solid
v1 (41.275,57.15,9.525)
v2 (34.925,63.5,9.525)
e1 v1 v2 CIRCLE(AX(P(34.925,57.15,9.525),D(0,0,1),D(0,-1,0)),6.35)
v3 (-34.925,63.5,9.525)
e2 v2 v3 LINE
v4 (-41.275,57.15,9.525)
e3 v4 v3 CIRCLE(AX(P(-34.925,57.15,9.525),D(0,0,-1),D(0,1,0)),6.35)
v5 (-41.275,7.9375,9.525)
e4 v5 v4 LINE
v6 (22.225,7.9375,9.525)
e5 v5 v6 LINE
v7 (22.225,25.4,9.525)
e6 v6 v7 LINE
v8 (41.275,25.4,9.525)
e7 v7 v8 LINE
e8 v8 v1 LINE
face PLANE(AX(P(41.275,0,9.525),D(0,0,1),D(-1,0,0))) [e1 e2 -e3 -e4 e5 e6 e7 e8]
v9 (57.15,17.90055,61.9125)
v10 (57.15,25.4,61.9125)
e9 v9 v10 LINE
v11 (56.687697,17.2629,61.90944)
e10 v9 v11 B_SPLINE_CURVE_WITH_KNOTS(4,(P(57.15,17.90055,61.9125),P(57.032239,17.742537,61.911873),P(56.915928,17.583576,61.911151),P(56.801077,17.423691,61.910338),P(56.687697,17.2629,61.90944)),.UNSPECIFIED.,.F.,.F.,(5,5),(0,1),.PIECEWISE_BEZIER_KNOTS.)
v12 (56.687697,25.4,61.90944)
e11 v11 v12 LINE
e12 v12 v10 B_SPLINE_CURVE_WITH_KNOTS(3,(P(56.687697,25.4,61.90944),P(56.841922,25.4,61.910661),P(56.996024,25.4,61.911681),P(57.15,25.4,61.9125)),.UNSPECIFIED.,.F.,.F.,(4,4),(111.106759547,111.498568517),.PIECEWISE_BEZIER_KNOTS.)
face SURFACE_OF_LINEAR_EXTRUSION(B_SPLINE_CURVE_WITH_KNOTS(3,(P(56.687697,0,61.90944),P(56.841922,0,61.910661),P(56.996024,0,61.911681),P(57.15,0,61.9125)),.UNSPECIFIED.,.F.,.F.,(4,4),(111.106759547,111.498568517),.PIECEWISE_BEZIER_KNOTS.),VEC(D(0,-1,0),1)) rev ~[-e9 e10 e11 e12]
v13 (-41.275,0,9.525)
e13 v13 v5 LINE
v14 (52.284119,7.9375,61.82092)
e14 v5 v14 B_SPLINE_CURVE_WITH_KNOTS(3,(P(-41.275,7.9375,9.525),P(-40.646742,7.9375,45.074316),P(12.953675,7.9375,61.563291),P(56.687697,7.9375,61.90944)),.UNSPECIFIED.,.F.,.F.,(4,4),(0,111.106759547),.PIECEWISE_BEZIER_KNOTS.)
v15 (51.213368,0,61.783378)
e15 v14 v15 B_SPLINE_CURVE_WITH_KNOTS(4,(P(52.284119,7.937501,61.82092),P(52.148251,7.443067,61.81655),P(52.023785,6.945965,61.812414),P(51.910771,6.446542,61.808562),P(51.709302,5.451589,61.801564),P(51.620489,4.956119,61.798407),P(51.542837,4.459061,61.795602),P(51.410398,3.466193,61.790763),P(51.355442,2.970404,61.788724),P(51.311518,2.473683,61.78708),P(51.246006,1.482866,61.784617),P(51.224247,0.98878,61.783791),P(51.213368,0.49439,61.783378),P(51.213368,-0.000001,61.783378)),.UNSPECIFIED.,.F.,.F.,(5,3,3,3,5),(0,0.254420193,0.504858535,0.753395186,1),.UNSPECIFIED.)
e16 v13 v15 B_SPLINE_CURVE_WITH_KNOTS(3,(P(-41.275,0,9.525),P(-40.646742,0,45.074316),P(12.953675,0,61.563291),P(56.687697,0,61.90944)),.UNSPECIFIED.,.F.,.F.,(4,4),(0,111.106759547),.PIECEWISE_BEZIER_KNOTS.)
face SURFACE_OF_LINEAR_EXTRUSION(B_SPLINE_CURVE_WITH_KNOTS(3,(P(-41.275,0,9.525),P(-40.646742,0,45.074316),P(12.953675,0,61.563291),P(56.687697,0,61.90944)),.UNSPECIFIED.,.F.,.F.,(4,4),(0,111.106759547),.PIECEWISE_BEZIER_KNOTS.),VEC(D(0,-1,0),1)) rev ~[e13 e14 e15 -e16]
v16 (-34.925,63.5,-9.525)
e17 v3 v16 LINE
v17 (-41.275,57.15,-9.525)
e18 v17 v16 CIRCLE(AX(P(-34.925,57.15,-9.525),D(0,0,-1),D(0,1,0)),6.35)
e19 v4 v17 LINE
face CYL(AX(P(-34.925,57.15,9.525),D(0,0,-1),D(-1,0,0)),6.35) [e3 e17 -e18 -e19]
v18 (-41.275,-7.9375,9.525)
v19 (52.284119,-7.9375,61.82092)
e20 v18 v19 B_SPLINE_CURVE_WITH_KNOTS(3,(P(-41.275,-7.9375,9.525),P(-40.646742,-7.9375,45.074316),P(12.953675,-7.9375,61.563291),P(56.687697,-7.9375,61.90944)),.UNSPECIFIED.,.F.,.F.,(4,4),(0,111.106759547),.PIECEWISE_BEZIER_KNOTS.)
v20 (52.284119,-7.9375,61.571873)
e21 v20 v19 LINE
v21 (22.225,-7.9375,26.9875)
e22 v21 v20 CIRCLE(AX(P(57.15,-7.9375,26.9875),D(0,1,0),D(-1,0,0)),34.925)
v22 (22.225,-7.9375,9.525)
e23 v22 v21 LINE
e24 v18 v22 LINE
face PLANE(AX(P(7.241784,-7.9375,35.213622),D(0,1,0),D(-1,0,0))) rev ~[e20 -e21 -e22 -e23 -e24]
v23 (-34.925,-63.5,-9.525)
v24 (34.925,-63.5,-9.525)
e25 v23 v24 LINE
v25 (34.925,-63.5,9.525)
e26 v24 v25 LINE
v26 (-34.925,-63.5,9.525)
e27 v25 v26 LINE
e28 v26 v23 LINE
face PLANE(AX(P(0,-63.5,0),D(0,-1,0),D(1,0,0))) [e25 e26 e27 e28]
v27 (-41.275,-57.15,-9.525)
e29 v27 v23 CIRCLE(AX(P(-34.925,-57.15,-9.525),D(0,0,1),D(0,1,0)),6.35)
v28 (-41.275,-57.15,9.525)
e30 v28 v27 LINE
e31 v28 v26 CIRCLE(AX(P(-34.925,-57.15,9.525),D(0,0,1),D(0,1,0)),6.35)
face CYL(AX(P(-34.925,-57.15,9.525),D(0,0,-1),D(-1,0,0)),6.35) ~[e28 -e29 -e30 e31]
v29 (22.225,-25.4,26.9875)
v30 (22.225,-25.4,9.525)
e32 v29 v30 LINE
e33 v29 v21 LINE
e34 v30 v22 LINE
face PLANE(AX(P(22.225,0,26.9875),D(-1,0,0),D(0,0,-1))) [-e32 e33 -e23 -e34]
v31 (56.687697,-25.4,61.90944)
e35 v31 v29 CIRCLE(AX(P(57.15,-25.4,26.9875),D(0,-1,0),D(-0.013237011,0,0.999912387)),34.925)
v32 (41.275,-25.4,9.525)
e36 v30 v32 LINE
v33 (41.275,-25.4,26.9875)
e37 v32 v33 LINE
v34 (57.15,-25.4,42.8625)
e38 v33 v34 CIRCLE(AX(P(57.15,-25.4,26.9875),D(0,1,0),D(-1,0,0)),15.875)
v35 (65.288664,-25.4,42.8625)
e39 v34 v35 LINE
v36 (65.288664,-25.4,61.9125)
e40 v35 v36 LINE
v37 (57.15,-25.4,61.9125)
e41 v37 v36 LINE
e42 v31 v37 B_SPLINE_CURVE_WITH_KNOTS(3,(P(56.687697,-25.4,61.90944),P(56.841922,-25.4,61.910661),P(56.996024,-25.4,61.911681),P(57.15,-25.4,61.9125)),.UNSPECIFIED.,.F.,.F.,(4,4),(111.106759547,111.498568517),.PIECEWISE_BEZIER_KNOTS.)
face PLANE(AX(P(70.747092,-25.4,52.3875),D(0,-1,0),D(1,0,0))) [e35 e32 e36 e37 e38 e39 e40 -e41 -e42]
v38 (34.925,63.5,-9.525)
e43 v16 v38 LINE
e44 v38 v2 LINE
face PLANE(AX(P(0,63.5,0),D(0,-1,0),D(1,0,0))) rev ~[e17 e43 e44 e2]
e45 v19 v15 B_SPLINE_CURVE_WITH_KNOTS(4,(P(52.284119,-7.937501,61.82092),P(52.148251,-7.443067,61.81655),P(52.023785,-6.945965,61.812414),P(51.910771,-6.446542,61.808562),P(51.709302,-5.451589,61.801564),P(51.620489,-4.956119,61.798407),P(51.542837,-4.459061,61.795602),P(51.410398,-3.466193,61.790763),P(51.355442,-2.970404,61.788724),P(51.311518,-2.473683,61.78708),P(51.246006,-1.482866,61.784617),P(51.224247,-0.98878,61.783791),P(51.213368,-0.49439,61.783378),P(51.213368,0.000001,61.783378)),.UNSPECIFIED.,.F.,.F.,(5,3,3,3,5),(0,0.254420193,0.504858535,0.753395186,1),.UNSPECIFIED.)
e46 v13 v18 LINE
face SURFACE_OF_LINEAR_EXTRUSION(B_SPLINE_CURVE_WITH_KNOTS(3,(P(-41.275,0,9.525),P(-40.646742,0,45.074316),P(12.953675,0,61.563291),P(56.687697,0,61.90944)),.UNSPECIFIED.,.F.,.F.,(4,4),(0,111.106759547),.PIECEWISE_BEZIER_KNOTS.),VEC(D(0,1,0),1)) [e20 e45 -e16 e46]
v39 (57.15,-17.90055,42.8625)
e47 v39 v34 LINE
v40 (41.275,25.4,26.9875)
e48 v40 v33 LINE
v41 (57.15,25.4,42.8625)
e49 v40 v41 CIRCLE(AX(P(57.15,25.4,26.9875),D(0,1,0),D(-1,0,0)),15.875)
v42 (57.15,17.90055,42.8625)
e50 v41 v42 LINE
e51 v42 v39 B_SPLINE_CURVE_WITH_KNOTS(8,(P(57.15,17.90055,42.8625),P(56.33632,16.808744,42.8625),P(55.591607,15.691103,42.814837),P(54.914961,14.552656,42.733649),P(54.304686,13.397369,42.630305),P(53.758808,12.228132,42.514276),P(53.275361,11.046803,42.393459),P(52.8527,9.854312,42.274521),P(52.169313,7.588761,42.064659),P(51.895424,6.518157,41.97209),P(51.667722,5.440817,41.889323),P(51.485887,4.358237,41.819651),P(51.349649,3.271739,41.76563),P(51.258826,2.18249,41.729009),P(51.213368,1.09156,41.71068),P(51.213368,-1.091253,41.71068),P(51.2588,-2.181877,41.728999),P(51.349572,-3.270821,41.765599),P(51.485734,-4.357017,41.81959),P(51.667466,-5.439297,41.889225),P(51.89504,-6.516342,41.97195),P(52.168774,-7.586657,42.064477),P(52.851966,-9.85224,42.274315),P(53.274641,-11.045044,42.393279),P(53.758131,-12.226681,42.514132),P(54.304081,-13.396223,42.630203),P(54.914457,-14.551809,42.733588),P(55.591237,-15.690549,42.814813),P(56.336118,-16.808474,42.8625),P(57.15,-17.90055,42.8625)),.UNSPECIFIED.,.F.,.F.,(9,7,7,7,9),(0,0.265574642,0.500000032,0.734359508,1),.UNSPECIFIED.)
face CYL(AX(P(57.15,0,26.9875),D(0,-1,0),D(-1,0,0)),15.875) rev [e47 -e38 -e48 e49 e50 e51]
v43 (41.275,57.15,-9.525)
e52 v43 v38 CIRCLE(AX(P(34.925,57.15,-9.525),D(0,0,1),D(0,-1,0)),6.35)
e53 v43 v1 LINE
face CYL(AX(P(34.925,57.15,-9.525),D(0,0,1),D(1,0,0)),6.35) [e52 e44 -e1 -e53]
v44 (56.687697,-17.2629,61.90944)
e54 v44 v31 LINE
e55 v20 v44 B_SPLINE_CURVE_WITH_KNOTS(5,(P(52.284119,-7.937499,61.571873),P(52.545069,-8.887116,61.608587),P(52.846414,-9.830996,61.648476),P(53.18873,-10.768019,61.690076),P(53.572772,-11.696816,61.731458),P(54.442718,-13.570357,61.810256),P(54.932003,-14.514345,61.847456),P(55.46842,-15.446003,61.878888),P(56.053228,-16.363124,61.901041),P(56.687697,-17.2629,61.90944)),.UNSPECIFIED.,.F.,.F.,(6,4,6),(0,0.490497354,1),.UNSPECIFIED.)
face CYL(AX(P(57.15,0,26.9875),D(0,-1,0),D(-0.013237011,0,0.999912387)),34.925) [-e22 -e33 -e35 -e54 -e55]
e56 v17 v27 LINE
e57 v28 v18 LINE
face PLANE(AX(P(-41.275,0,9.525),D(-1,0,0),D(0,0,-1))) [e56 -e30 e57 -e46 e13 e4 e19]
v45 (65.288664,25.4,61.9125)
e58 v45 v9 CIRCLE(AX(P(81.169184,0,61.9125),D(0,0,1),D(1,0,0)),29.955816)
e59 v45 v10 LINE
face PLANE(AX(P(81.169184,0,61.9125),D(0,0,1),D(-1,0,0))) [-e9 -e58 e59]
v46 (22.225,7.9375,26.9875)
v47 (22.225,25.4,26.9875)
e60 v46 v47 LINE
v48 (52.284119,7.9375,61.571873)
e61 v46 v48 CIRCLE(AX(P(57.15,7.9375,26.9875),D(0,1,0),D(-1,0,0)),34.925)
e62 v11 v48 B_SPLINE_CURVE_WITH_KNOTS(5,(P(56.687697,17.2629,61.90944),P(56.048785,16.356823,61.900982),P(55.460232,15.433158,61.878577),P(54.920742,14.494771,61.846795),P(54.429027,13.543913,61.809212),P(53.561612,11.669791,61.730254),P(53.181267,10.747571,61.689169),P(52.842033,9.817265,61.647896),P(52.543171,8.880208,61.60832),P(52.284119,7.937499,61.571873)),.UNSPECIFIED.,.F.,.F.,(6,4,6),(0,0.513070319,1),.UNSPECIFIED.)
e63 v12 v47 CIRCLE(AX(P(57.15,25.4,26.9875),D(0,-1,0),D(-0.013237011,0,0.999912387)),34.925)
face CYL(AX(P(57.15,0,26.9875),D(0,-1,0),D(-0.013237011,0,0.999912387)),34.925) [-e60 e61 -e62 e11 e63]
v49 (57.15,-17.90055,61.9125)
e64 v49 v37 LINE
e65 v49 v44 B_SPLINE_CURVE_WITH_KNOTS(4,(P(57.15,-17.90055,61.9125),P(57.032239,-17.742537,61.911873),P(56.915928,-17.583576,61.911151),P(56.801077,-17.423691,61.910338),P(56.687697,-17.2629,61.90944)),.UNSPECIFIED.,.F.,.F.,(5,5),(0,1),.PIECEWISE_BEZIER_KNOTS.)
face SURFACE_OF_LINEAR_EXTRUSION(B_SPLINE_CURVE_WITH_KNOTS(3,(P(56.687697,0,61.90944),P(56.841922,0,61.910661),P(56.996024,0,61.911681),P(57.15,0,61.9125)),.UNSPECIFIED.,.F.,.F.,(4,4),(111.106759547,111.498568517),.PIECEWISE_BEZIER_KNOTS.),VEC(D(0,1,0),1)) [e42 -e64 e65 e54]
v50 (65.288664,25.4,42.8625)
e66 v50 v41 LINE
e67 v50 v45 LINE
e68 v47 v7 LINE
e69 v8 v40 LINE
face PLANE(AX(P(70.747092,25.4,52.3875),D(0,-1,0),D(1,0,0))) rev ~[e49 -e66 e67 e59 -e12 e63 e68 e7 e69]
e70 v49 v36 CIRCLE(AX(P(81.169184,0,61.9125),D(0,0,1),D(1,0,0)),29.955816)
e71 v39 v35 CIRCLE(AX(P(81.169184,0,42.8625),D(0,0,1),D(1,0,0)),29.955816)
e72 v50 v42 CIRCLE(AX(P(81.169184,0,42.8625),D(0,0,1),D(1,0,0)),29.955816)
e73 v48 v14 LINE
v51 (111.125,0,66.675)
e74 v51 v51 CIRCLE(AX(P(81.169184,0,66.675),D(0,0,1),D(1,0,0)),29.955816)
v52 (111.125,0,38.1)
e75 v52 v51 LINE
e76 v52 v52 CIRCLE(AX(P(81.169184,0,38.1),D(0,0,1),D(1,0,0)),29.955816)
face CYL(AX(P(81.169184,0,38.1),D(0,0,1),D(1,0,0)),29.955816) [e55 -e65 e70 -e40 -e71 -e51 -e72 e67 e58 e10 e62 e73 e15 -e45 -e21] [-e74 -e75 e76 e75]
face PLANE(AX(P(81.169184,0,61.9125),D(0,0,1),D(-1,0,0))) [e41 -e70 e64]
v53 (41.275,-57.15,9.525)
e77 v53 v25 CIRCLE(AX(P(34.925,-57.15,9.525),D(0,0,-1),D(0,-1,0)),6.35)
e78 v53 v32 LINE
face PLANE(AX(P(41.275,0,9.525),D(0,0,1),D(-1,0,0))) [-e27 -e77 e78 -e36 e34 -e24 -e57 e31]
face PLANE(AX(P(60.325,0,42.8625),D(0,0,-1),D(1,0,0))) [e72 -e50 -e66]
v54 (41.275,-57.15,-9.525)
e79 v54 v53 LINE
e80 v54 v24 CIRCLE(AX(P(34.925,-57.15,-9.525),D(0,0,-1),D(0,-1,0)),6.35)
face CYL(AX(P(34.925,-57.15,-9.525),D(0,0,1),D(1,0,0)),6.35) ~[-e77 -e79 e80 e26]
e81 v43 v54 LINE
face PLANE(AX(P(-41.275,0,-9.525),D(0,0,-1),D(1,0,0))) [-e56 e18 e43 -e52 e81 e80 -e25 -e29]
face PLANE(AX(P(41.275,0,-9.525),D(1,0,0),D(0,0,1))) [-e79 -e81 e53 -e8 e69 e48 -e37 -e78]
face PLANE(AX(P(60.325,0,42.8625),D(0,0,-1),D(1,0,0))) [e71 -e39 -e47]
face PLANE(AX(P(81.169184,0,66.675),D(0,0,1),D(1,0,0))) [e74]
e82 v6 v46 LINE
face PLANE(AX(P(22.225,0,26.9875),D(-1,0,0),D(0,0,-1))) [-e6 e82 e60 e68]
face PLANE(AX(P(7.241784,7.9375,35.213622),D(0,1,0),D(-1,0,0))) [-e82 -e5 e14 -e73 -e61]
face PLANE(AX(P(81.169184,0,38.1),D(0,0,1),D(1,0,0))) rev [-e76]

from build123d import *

# Parameters (mm, degrees)
F1_DEPTH = 63.5
F2_DEPTH = 25.4
F3_DEPTH = 7.9375
F4_DEPTH = 25.4
F6_R     = 6.35


# Not quite as in the source:
# - a feature names something its author has since deleted; it is built from what else it names


with BuildPart() as f1:
    # F0 (on Front) → F1 (new body, symmetric)
    with BuildSketch(Plane.XZ):
        Polygon((-41.275, 9.525), (-41.275, -9.525), (41.275, -9.525), (41.275, 9.525), (22.225, 9.525), align=None)
    extrude(amount=F1_DEPTH, both=True)

    # F0 (on Front) → F2 (join, symmetric)
    with BuildSketch(Plane.XZ):
        with BuildLine():
            Line((22.225, 9.525), (41.275, 9.525))
            Line((41.275, 9.525), (41.275, 26.9875))
            ThreePointArc((41.275, 26.9875), (45.9246798487, 38.2128201513), (57.15, 42.8625))
            Line((57.15, 42.8625), (60.325, 42.8625))
            Line((60.325, 42.8625), (60.325, 61.9125))
            Line((60.325, 61.9125), (57.15, 61.9125))
            add(Edge.make_bspline(
                [(56.6876973993, 61.9094401137), (56.8419218796, 61.9106607794), (56.996023665, 61.9116806988), (57.15, 61.9125)],
                knots=[111.1067595469, 111.1067595469, 111.1067595469, 111.1067595469, 111.4985685166, 111.4985685166, 111.4985685166, 111.4985685166], degree=3))
            ThreePointArc((56.6876973993, 61.9094401137), (32.2913843574, 51.5192111783), (22.225, 26.9875))
            Line((22.225, 26.9875), (22.225, 9.525))
        make_face()
    extrude(amount=F2_DEPTH, both=True)

    # F0 (on Front) → F3 (join, symmetric)
    with BuildSketch(Plane.XZ):
        with BuildLine():
            add(Edge.make_bspline(
                [(-41.275, 9.525), (-40.6467419825, 45.0743155721), (12.9536750235, 61.5632913076), (56.6876973993, 61.9094401137)],
                knots=[0, 0, 0, 0, 111.1067595469, 111.1067595469, 111.1067595469, 111.1067595469], degree=3))
            Line((-41.275, 9.525), (22.225, 9.525))
            Line((22.225, 9.525), (22.225, 26.9875))
            ThreePointArc((22.225, 26.9875), (32.2913843574, 51.5192111783), (56.6876973993, 61.9094401137))
        make_face()
    extrude(amount=F3_DEPTH, both=True)

    # F0 (on Front) → F4 (join, symmetric)
    with BuildSketch(Plane.XZ):
        Polygon((81.1691840627, 61.9125), (60.325, 61.9125), (60.325, 42.8625), (81.1691840627, 42.8625), (81.1691840627, 52.7276583016), align=None)
    extrude(amount=F4_DEPTH, both=True)

    # F0 (on Front) → F5 (revolve)
    with BuildSketch(Plane.XZ):
        Polygon((81.1691840627, 66.675), (81.1691840627, 61.9125), (81.1691840627, 52.7276583016), (81.1691840627, 42.8625), (81.1691840627, 38.1), (111.125, 38.1), (111.125, 66.675), align=None)
    revolve(axis=Axis((81.1691840627, 0, 57.3200791508), (0, 0, 1)))

    # F6
    f6_edges = [f1.edges().sort_by_distance(p)[0] for p in [
        (-41.275, -63.5, 0),
        (41.275, -63.5, 0),
        (41.275, 63.5, 0),
        (-41.275, 63.5, 0),
    ]]
    fillet(f6_edges, radius=F6_R)


solid = f1.part
